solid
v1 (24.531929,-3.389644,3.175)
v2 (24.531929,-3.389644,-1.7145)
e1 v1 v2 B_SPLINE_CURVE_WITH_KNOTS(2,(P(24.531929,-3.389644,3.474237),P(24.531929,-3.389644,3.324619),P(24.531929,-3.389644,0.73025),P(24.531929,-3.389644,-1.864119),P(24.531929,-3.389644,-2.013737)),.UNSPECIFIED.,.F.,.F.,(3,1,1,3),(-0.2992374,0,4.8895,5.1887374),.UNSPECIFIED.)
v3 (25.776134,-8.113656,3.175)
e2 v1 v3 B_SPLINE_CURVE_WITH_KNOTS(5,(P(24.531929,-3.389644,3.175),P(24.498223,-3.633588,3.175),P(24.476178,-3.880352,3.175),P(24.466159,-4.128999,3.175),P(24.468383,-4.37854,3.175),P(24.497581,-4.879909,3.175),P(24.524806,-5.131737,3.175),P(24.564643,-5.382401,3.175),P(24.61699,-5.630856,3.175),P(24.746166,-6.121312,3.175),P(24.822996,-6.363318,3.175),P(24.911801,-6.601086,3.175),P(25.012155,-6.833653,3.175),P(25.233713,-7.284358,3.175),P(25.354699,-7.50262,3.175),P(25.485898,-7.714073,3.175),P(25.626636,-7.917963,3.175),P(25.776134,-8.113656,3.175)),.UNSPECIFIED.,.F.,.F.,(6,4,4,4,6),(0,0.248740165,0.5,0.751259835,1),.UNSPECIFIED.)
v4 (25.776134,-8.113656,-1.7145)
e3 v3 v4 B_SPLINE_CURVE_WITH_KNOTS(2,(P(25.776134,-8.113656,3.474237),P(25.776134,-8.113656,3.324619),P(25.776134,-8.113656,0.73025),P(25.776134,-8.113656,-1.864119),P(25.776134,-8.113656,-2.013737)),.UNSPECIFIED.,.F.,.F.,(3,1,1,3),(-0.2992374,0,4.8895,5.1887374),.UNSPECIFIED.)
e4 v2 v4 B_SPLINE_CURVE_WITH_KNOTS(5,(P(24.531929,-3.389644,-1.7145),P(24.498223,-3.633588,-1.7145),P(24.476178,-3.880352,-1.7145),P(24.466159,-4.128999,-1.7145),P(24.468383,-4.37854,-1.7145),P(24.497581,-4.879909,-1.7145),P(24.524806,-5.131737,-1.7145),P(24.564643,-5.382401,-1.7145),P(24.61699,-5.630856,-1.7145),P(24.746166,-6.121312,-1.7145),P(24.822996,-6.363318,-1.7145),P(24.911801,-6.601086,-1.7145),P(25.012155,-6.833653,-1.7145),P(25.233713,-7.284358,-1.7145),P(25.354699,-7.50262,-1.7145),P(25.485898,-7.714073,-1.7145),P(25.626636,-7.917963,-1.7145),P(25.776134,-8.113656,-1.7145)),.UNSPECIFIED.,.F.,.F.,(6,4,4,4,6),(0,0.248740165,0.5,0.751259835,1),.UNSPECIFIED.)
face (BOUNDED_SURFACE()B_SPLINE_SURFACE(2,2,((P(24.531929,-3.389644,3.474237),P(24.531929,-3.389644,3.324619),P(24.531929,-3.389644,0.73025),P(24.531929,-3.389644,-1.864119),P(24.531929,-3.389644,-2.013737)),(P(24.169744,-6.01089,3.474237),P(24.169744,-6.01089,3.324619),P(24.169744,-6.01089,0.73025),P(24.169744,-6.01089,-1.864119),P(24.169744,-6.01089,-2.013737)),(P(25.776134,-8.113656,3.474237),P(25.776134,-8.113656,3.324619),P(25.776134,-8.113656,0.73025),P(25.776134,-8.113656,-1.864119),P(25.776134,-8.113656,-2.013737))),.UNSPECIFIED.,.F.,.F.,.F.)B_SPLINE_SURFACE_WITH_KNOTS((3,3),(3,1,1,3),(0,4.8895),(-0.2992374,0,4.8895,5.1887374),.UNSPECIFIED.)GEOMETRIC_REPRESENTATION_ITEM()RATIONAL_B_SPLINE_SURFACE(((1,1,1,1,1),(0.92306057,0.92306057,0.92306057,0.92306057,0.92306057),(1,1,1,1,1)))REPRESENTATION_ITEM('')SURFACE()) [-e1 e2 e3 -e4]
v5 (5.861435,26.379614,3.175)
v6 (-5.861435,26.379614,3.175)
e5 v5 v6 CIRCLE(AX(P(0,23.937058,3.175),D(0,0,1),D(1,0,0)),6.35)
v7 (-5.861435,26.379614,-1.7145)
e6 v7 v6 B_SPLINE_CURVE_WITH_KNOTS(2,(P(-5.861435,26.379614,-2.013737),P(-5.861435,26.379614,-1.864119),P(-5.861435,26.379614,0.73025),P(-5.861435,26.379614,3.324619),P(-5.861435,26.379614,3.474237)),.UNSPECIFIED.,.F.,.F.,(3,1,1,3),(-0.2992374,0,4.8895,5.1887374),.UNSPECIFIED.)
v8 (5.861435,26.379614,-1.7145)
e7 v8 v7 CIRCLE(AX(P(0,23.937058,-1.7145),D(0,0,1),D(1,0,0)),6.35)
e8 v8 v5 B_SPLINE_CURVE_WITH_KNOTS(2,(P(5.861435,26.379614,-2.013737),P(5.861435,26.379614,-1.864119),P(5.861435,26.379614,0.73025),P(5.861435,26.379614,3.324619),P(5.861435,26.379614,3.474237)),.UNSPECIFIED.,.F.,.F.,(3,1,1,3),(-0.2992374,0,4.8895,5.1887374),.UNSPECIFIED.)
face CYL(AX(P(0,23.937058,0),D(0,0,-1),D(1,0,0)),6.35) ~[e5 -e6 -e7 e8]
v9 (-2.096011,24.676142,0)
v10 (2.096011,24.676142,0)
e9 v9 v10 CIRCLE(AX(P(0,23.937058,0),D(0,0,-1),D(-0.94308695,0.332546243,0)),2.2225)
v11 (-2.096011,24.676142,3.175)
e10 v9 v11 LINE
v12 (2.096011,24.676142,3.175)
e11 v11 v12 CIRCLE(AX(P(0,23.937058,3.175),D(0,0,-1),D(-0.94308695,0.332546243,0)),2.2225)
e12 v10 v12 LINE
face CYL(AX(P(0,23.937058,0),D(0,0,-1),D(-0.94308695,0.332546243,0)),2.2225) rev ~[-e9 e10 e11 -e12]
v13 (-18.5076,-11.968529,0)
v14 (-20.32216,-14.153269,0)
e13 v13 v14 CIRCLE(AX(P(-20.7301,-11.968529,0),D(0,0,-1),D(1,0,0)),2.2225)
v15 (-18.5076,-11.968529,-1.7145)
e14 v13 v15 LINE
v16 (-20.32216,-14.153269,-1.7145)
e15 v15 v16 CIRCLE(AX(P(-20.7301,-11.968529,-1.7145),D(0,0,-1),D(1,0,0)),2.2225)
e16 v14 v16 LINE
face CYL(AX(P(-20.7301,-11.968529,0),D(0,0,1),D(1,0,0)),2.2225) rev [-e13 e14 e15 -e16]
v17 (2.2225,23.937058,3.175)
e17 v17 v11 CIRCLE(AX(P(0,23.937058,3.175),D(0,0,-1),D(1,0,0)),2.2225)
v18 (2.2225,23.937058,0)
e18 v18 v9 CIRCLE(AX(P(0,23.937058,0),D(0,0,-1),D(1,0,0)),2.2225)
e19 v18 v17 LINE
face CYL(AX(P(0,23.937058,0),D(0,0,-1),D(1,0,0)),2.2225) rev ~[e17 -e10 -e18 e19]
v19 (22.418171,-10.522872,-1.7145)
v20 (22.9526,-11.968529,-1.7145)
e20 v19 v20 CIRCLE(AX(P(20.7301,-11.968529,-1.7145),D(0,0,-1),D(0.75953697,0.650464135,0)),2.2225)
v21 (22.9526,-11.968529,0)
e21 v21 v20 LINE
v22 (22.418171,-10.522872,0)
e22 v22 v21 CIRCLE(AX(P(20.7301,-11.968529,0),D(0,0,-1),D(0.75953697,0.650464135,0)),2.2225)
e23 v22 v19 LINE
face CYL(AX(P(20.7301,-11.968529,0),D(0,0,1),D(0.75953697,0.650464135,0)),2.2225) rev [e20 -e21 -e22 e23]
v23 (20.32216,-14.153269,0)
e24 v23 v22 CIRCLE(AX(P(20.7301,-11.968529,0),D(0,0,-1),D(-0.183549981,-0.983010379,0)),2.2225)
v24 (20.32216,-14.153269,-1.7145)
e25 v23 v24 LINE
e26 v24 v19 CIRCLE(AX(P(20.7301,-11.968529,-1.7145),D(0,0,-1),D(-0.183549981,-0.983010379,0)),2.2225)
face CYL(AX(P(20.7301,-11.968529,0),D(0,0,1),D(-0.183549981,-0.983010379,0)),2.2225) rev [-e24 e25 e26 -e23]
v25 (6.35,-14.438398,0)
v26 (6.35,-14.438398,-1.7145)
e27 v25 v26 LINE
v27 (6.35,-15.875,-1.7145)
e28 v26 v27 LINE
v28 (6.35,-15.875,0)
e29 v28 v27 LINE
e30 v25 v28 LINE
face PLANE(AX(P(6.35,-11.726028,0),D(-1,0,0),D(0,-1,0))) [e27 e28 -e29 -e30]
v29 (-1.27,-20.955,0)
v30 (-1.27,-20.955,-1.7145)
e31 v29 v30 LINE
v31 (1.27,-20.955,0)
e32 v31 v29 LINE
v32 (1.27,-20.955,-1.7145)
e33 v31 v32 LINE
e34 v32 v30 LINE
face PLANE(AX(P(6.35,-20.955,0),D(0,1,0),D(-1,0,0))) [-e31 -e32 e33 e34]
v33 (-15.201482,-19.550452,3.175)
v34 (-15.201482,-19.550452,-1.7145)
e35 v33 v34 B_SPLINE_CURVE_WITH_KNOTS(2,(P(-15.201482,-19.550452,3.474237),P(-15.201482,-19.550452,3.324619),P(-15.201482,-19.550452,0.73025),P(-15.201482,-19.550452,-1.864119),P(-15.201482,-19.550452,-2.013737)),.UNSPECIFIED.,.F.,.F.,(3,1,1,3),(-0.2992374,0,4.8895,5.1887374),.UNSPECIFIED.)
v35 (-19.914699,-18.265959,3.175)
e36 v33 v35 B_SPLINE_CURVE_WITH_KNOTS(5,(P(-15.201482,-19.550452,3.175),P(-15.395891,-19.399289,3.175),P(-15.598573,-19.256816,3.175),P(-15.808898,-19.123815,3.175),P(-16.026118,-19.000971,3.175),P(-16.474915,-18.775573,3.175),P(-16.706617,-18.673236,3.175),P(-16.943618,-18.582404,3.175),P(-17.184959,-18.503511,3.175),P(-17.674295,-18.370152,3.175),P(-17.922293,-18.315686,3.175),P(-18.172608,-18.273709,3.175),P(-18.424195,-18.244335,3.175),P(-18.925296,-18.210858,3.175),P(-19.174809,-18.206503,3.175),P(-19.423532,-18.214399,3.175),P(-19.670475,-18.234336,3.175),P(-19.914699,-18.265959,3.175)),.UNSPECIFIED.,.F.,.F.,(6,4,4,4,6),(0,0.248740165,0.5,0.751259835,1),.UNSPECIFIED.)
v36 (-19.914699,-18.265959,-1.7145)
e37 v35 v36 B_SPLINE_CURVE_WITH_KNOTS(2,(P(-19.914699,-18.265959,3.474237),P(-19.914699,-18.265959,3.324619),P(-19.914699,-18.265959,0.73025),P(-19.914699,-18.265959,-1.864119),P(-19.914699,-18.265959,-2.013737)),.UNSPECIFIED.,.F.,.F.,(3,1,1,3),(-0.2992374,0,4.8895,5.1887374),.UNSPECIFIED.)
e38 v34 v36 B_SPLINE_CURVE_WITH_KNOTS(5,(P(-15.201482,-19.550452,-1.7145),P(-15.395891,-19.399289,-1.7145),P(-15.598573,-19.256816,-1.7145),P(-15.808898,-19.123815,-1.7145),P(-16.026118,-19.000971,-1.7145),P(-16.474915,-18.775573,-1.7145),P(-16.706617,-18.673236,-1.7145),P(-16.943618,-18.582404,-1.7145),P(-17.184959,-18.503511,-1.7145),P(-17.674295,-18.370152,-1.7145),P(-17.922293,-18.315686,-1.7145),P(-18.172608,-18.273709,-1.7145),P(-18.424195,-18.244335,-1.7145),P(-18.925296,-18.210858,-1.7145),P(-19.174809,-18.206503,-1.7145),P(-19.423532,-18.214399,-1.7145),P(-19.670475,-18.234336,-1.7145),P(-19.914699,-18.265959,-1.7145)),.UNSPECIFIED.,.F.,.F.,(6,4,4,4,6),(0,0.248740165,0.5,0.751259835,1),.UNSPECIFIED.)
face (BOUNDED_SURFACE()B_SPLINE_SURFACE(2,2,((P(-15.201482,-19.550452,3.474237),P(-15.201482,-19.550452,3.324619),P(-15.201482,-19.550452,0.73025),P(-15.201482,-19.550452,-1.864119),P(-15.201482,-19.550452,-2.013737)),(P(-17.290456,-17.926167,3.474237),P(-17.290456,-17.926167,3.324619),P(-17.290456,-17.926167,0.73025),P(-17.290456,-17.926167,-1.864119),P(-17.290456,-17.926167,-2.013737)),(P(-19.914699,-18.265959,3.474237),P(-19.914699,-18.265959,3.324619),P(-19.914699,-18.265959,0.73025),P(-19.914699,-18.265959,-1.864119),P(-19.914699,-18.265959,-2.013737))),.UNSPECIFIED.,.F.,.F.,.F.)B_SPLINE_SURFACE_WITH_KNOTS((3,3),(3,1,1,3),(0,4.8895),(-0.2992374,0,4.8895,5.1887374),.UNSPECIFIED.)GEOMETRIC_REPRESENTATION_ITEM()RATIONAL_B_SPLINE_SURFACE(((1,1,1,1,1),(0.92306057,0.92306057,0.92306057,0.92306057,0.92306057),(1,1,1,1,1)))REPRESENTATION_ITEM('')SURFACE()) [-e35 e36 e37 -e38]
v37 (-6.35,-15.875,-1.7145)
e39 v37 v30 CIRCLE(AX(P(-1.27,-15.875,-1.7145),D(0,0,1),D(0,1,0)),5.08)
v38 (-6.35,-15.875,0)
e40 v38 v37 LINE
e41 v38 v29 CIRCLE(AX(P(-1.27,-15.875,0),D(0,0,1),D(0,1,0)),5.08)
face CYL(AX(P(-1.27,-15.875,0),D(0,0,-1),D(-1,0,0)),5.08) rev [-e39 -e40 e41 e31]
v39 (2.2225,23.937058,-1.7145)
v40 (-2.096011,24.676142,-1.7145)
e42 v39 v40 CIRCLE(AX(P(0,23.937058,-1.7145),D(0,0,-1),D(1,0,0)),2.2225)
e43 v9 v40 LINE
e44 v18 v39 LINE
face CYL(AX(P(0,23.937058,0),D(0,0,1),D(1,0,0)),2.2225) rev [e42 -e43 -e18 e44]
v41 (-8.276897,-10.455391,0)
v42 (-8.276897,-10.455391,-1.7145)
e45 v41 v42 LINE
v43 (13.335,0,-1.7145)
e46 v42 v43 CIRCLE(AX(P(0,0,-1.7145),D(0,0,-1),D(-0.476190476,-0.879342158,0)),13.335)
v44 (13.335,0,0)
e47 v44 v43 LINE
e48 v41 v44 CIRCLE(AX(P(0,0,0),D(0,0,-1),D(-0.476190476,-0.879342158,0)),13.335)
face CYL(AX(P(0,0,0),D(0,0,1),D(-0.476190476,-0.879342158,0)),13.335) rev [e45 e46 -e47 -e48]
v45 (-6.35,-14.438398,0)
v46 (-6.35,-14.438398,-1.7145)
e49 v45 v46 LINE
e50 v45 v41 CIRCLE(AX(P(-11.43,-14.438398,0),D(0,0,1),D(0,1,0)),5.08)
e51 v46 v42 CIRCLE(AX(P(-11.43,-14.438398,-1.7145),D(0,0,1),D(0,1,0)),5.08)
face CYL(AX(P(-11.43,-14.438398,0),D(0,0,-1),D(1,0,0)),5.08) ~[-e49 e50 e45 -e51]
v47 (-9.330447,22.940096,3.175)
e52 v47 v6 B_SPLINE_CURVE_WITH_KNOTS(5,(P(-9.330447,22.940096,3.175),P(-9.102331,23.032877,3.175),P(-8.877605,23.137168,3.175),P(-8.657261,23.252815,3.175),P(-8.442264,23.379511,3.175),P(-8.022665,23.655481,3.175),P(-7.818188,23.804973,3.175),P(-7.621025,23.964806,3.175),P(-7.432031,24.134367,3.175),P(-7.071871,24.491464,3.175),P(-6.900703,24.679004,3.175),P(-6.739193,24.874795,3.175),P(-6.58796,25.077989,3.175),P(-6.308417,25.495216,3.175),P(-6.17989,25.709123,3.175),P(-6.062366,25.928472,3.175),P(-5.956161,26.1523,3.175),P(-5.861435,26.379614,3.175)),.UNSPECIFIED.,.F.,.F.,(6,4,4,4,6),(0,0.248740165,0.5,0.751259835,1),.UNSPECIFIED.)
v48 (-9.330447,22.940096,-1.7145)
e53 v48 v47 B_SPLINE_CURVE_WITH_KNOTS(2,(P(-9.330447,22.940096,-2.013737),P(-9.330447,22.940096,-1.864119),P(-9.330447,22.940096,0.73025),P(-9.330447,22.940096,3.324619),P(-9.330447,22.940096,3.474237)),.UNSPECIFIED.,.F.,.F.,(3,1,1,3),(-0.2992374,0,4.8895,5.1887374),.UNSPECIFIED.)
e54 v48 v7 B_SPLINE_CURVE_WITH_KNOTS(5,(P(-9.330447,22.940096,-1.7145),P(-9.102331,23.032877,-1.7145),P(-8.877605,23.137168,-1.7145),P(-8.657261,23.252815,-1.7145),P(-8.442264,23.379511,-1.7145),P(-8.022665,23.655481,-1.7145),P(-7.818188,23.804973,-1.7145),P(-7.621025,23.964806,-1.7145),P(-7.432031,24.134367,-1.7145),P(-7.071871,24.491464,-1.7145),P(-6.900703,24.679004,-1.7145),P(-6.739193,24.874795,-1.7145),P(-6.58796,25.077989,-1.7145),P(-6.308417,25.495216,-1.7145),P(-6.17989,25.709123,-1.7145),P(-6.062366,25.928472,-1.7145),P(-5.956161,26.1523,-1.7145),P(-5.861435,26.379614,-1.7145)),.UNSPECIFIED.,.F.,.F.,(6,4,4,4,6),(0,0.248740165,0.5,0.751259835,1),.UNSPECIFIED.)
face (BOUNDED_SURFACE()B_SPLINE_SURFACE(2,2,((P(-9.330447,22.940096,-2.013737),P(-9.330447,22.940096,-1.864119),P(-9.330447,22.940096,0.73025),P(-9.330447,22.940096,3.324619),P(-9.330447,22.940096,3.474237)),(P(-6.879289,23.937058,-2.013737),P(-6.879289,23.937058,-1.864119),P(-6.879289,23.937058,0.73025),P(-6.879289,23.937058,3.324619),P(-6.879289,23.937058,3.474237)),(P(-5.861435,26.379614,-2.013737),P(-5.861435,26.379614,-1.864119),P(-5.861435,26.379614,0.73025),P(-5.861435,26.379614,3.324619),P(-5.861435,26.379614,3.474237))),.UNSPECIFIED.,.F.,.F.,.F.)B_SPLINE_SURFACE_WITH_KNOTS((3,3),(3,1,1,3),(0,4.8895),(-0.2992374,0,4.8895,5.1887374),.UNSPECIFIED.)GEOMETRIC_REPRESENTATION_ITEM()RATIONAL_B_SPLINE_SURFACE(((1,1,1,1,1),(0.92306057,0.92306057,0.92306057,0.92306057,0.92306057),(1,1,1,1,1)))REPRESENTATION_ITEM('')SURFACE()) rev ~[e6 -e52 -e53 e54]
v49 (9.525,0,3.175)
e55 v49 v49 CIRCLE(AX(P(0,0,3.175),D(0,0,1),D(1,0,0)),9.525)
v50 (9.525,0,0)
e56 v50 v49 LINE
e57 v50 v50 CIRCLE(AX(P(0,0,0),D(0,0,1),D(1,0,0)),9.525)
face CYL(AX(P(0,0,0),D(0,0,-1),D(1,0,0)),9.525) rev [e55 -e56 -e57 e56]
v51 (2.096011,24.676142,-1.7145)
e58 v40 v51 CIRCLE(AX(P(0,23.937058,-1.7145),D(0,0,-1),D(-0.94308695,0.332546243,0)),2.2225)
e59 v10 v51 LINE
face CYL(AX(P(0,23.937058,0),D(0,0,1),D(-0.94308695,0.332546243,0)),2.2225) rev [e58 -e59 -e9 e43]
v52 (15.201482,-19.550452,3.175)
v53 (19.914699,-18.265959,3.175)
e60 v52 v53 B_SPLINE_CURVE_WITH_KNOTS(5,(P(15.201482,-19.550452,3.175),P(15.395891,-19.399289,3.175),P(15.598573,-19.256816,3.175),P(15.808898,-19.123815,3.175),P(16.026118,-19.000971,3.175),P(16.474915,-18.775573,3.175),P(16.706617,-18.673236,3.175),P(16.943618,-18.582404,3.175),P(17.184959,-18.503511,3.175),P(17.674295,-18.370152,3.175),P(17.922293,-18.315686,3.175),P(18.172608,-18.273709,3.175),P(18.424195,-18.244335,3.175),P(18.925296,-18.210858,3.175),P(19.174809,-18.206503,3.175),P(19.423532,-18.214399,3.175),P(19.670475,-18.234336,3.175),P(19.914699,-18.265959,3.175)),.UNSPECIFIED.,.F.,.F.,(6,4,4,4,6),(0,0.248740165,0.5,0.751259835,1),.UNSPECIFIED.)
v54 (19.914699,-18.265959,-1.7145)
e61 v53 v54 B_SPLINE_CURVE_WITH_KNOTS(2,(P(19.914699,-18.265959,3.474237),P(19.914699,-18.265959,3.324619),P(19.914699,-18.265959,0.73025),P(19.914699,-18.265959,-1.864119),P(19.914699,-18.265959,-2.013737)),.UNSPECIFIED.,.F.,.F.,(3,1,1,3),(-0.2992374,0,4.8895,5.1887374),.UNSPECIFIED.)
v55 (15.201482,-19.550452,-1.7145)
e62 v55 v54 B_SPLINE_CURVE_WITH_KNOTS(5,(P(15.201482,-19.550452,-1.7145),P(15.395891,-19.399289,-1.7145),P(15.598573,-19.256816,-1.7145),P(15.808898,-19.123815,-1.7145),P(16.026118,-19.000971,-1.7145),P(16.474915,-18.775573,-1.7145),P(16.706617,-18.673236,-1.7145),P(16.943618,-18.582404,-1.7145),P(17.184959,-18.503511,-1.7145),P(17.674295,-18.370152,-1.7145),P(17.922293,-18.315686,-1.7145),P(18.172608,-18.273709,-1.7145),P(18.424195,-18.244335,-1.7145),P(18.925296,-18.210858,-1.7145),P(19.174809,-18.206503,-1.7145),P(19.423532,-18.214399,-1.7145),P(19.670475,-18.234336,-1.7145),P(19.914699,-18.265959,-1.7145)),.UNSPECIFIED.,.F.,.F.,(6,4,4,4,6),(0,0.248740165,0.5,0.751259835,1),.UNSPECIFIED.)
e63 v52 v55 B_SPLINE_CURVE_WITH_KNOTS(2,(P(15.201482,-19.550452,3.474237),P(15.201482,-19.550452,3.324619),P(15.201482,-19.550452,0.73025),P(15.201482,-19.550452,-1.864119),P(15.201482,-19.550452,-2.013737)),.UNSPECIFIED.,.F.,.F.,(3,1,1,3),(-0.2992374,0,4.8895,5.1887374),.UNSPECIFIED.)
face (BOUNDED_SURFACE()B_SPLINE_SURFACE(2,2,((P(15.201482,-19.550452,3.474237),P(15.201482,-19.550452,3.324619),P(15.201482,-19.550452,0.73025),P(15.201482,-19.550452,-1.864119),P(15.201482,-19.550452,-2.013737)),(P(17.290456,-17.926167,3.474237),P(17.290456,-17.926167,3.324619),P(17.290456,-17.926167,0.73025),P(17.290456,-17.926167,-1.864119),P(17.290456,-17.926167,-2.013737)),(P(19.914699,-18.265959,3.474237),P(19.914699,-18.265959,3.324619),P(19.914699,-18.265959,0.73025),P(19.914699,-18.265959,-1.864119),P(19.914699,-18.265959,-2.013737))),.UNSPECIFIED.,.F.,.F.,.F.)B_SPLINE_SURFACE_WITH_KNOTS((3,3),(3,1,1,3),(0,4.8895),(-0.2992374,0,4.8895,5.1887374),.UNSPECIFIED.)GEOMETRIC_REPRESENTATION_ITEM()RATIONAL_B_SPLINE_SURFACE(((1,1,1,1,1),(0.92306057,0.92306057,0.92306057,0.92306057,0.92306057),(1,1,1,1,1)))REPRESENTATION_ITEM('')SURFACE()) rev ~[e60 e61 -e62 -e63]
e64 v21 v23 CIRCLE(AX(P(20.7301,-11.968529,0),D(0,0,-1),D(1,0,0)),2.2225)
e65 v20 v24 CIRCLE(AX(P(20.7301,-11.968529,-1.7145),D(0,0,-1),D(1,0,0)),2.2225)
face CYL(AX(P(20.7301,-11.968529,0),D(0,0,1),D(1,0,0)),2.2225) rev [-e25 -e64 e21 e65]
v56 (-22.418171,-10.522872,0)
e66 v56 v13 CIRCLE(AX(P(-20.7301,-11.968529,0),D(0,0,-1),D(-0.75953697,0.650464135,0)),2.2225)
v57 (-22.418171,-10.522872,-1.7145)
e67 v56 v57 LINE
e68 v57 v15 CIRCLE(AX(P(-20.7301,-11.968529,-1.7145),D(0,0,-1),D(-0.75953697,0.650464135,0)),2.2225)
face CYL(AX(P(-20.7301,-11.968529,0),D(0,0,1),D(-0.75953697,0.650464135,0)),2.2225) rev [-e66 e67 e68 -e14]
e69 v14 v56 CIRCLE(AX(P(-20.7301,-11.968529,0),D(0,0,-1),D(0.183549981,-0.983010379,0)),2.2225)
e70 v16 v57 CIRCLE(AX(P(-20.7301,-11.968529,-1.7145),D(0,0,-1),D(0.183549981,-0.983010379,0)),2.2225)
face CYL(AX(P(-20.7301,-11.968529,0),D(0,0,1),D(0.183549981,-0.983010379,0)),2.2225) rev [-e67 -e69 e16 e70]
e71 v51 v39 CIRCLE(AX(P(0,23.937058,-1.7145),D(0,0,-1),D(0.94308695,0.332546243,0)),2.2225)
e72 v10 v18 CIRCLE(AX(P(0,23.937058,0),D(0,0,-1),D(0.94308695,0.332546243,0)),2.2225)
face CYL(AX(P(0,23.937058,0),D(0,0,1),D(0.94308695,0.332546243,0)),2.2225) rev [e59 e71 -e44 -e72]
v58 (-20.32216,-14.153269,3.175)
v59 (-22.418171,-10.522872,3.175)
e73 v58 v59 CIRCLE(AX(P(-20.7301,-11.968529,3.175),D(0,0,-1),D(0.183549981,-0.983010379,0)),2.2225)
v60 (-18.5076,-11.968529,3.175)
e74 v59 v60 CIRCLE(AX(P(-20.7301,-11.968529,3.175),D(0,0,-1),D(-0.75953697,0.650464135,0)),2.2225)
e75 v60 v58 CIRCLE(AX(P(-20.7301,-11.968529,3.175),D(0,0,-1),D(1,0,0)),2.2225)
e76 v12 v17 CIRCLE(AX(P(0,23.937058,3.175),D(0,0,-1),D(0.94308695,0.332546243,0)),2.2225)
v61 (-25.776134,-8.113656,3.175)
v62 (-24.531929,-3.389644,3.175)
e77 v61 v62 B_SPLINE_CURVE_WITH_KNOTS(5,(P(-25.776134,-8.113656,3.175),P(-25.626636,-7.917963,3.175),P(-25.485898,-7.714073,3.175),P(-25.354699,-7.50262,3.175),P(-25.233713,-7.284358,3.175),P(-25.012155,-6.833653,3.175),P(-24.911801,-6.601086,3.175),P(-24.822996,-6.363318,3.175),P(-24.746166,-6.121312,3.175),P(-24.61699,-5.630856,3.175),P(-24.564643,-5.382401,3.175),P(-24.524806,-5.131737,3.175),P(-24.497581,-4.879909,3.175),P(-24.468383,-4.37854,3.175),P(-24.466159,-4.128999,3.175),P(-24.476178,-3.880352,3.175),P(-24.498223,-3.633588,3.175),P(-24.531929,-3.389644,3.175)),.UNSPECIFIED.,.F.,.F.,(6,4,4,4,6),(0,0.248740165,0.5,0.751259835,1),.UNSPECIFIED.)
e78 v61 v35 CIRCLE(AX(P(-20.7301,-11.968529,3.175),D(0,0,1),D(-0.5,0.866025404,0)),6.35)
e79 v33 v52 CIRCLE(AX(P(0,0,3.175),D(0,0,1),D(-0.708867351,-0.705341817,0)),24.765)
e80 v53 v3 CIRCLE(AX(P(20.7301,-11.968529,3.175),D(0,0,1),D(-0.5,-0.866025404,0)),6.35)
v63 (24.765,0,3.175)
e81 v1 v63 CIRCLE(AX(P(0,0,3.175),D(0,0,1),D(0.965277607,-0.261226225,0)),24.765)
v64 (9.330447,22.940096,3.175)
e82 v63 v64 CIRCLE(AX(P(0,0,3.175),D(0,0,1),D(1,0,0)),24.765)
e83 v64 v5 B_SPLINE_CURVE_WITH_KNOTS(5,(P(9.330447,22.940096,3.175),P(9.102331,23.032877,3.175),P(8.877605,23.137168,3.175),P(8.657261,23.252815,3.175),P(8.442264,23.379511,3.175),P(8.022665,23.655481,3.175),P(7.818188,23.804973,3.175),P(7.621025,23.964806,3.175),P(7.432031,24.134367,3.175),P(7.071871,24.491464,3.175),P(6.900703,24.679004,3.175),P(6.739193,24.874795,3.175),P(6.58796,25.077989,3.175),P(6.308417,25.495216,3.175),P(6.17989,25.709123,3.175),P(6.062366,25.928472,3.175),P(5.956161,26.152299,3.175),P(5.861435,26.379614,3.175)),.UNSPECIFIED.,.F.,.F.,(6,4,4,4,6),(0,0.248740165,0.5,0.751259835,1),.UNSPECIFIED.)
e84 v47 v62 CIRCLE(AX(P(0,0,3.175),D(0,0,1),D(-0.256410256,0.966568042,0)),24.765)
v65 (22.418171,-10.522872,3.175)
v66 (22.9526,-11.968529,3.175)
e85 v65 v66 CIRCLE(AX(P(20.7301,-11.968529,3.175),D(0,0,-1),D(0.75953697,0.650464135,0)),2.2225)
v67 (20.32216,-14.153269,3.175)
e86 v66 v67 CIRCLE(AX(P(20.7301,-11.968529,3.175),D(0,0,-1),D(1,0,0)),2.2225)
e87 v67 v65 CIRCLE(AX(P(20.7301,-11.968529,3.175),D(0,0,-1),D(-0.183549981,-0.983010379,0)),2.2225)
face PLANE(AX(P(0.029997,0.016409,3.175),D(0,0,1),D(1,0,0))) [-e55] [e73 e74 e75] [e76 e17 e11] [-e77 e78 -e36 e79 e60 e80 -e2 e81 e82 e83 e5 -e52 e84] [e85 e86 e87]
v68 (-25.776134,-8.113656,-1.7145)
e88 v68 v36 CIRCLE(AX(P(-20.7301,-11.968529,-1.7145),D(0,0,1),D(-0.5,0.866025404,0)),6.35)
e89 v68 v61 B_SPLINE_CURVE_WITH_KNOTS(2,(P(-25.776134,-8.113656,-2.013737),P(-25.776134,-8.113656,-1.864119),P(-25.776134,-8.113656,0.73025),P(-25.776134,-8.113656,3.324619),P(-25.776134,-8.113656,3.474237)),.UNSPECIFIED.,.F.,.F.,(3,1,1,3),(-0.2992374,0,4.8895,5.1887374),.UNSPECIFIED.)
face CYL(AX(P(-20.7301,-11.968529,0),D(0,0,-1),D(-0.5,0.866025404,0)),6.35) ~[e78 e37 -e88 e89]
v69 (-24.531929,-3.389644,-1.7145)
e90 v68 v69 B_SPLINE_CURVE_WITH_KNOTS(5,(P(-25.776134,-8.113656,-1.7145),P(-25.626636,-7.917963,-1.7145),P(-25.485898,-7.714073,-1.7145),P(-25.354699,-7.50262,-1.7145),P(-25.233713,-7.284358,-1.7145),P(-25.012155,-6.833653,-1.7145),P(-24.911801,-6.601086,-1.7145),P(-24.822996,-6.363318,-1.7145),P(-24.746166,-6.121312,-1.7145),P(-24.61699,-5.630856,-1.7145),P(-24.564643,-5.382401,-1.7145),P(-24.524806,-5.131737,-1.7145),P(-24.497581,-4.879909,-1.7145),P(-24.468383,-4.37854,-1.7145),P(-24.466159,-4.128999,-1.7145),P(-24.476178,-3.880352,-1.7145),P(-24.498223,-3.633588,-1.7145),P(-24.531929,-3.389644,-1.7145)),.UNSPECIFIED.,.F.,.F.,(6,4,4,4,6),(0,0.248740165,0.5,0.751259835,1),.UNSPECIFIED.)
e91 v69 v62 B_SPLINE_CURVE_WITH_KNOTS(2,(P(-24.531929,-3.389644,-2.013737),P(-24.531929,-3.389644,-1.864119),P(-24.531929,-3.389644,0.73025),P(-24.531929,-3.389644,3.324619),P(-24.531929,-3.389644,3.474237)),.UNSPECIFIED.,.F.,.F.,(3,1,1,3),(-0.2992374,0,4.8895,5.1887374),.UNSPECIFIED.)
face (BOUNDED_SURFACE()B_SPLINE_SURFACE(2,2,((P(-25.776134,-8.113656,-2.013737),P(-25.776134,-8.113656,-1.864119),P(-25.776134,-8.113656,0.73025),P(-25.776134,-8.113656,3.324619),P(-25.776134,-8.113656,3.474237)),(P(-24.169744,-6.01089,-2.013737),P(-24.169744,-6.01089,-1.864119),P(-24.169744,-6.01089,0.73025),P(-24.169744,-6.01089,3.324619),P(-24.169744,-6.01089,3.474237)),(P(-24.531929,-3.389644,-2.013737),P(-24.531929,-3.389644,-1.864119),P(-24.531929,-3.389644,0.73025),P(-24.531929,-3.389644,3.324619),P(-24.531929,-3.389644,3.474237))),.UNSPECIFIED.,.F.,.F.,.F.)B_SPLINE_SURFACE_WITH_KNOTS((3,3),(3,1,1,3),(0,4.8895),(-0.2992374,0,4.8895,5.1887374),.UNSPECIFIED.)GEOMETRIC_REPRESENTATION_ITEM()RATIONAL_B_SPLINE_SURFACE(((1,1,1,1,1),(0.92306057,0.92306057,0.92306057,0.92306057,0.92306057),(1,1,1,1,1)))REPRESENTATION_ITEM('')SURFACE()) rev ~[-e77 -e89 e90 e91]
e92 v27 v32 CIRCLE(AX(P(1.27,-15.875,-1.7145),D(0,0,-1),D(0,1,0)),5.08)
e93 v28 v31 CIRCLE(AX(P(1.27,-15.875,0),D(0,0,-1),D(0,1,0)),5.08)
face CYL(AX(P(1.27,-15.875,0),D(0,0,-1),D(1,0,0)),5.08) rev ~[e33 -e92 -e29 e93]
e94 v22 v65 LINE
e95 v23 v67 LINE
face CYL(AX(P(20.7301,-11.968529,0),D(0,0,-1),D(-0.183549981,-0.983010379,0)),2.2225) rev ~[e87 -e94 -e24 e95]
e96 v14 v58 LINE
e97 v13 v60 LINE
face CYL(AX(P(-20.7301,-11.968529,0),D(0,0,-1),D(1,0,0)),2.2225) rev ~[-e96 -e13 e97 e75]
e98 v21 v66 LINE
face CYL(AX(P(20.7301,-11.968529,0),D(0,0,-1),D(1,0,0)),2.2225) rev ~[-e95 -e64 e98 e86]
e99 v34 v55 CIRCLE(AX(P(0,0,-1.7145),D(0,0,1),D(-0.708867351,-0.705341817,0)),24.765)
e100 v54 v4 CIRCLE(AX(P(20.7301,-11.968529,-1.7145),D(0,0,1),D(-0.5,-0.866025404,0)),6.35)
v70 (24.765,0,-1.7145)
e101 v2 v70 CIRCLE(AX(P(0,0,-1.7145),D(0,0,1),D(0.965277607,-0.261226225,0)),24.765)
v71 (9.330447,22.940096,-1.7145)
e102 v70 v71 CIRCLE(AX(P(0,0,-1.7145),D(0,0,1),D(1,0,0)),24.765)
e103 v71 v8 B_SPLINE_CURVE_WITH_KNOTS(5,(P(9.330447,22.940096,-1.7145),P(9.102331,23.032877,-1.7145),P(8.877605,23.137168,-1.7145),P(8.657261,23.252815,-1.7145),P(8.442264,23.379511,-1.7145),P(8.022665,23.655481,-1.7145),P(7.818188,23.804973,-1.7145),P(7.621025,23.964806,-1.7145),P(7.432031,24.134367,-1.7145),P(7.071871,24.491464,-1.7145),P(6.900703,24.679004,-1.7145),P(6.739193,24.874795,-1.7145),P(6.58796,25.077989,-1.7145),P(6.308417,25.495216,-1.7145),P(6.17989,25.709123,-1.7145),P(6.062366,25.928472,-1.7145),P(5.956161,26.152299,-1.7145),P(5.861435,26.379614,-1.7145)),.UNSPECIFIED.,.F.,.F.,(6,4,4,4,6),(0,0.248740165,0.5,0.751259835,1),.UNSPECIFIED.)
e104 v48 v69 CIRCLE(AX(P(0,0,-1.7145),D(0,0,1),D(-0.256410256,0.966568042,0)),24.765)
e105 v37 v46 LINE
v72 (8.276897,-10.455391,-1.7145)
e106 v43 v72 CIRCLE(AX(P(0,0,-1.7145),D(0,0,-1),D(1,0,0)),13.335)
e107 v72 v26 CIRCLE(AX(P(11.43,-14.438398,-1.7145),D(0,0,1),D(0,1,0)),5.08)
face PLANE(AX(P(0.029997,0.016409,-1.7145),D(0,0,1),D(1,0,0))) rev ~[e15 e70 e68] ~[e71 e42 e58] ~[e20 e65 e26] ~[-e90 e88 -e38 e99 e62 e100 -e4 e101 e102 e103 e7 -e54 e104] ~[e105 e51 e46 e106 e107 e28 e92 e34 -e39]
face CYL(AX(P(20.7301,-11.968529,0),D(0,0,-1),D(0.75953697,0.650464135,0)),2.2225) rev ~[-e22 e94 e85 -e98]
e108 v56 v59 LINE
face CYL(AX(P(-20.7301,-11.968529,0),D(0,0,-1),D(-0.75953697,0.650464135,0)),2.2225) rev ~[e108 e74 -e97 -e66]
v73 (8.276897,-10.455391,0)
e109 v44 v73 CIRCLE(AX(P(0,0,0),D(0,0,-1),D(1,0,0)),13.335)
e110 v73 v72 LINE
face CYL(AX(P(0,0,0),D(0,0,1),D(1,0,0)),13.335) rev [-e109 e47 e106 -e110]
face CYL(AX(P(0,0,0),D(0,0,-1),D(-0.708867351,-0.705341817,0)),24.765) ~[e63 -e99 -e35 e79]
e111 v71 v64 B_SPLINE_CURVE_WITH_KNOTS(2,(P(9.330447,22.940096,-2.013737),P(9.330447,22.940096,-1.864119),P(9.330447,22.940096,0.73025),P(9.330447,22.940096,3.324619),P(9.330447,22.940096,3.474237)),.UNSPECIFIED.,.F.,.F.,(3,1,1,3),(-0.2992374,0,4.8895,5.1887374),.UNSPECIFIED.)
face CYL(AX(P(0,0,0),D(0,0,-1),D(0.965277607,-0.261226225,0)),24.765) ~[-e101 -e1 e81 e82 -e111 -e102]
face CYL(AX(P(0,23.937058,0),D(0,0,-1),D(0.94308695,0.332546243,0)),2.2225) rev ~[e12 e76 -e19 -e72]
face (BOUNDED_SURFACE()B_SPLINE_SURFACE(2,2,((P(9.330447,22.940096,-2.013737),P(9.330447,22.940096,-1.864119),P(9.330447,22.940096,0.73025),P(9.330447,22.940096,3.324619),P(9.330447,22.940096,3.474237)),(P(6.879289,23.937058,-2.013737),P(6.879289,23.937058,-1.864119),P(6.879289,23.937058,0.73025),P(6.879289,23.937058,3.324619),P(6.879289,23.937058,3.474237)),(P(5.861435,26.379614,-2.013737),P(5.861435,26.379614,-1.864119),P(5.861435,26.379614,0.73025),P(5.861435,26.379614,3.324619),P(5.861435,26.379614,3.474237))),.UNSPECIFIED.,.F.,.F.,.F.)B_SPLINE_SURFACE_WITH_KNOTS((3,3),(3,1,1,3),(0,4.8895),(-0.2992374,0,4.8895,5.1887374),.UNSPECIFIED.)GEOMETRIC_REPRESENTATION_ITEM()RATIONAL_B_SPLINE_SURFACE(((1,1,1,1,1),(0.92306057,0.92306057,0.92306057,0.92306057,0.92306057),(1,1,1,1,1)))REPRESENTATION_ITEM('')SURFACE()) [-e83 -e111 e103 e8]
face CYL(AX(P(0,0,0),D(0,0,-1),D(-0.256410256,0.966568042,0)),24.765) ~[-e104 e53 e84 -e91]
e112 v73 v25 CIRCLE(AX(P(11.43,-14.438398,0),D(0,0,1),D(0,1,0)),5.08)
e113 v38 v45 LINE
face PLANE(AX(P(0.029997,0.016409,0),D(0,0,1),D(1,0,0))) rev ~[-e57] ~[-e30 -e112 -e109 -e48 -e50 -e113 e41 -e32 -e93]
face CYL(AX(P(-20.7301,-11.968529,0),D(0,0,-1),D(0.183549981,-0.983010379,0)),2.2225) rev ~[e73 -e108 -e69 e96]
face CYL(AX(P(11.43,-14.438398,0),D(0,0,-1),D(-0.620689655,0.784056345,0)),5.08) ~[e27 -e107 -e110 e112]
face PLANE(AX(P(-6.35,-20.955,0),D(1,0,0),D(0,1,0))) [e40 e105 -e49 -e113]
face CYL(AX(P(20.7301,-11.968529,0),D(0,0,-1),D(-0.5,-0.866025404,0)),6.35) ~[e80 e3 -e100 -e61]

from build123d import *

# Parameters (mm, degrees)
F1_DEPTH = 1.7145
F0_R     = 9.525
F2_DEPTH = 3.175
F3_R     = 6.35
F4_R     = 5.08


with BuildPart() as f1:
    # F0 (on Top) → F1 (new body)
    with BuildSketch(Plane.XY):
        with BuildLine():
            ThreePointArc((23.9050999455, -6.4692674698), (24.5490837421, -3.2630832697), (24.765, 0))
            ThreePointArc((24.765, 0), (19.6285885254, 15.1004548773), (6.35, 23.9370575677))
            ThreePointArc((6.35, 23.9370575677), (4.2391432725, 24.3994854314), (2.0960107473, 24.6761415936))
            ThreePointArc((2.0960107473, 24.6761415936), (2.1906494626, 24.3119724675), (2.2225, 23.9370575677))
            ThreePointArc((2.2225, 23.9370575677), (-0.3749148998, 21.7464081051), (-2.0960107473, 24.6761415936))
            ThreePointArc((-2.0960107473, 24.6761415936), (-4.2391432725, 24.3994854314), (-6.35, 23.9370575677))
            ThreePointArc((-6.35, 23.9370575677), (-21.4471191247, 12.3825), (-23.9050999455, -6.4692674698))
            ThreePointArc((-23.9050999455, -6.4692674698), (-23.2501458591, -8.5285369514), (-22.4181708611, -10.5228722431))
            ThreePointArc((-22.4181708611, -10.5228722431), (-19.9594610417, -9.8839132486), (-18.5075999455, -11.9685287839))
            ThreePointArc((-18.5075999455, -11.9685287839), (-19.02039931, -13.3885393426), (-20.3221601138, -14.1532693505))
            ThreePointArc((-20.3221601138, -14.1532693505), (-19.0110025866, -15.87094848), (-17.5550999455, -17.4677900979))
            ThreePointArc((-17.5550999455, -17.4677900979), (0, -24.765), (17.5550999455, -17.4677900979))
            ThreePointArc((17.5550999455, -17.4677900979), (19.0110025866, -15.87094848), (20.3221601138, -14.1532693505))
            ThreePointArc((20.3221601138, -14.1532693505), (18.8053584856, -10.8572787839), (22.4181708611, -10.5228722431))
            ThreePointArc((22.4181708611, -10.5228722431), (23.2501458591, -8.5285369514), (23.9050999455, -6.4692674698))
        make_face()
        with BuildLine():
            ThreePointArc((-6.35, -11.7260276735), (-6.8244038201, 11.4564277809), (13.335, 0))
            ThreePointArc((13.335, 0), (11.4564277809, -6.8244038201), (6.35, -11.7260276735))
            Line((6.35, -11.7260276735), (6.35, -20.955))
            Line((6.35, -20.955), (-6.35, -20.955))
            Line((-6.35, -20.955), (-6.35, -11.7260276735))
        make_face(mode=Mode.SUBTRACT)
        with BuildLine():
            ThreePointArc((2.0960107473, 24.6761415936), (4.2391432725, 24.3994854314), (6.35, 23.9370575677))
            ThreePointArc((6.35, 23.9370575677), (0, 30.2870575677), (-6.35, 23.9370575677))
            ThreePointArc((-6.35, 23.9370575677), (-4.2391432725, 24.3994854314), (-2.0960107473, 24.6761415936))
            ThreePointArc((-2.0960107473, 24.6761415936), (0, 26.1595575677), (2.0960107473, 24.6761415936))
        make_face()
        with BuildLine():
            ThreePointArc((17.5550999455, -17.4677900979), (26.2293612595, -15.1435287839), (23.9050999455, -6.4692674698))
            ThreePointArc((23.9050999455, -6.4692674698), (23.2501458591, -8.5285369514), (22.4181708611, -10.5228722431))
            ThreePointArc((22.4181708611, -10.5228722431), (22.8147154808, -11.1978898801), (22.9525999455, -11.9685287839))
            ThreePointArc((22.9525999455, -11.9685287839), (22.1501105043, -13.6782294193), (20.3221601138, -14.1532693505))
            ThreePointArc((20.3221601138, -14.1532693505), (19.0110025866, -15.87094848), (17.5550999455, -17.4677900979))
        make_face()
        with BuildLine():
            ThreePointArc((-22.4181708611, -10.5228722431), (-23.2501458591, -8.5285369514), (-23.9050999455, -6.4692674698))
            ThreePointArc((-23.9050999455, -6.4692674698), (-26.2293612595, -15.1435287839), (-17.5550999455, -17.4677900979))
            ThreePointArc((-17.5550999455, -17.4677900979), (-19.0110025866, -15.87094848), (-20.3221601138, -14.1532693505))
            ThreePointArc((-20.3221601138, -14.1532693505), (-22.6548414054, -13.0797787839), (-22.4181708611, -10.5228722431))
        make_face()
    extrude(amount=-F1_DEPTH)

    # F0 (on Top) → F2 (join)
    with BuildSketch(Plane.XY):
        with BuildLine():
            ThreePointArc((23.9050999455, -6.4692674698), (24.5490837421, -3.2630832697), (24.765, 0))
            ThreePointArc((24.765, 0), (19.6285885254, 15.1004548773), (6.35, 23.9370575677))
            ThreePointArc((6.35, 23.9370575677), (4.2391432725, 24.3994854314), (2.0960107473, 24.6761415936))
            ThreePointArc((2.0960107473, 24.6761415936), (2.1906494626, 24.3119724675), (2.2225, 23.9370575677))
            ThreePointArc((2.2225, 23.9370575677), (-0.3749148998, 21.7464081051), (-2.0960107473, 24.6761415936))
            ThreePointArc((-2.0960107473, 24.6761415936), (-4.2391432725, 24.3994854314), (-6.35, 23.9370575677))
            ThreePointArc((-6.35, 23.9370575677), (-21.4471191247, 12.3825), (-23.9050999455, -6.4692674698))
            ThreePointArc((-23.9050999455, -6.4692674698), (-23.2501458591, -8.5285369514), (-22.4181708611, -10.5228722431))
            ThreePointArc((-22.4181708611, -10.5228722431), (-19.9594610417, -9.8839132486), (-18.5075999455, -11.9685287839))
            ThreePointArc((-18.5075999455, -11.9685287839), (-19.02039931, -13.3885393426), (-20.3221601138, -14.1532693505))
            ThreePointArc((-20.3221601138, -14.1532693505), (-19.0110025866, -15.87094848), (-17.5550999455, -17.4677900979))
            ThreePointArc((-17.5550999455, -17.4677900979), (0, -24.765), (17.5550999455, -17.4677900979))
            ThreePointArc((17.5550999455, -17.4677900979), (19.0110025866, -15.87094848), (20.3221601138, -14.1532693505))
            ThreePointArc((20.3221601138, -14.1532693505), (18.8053584856, -10.8572787839), (22.4181708611, -10.5228722431))
            ThreePointArc((22.4181708611, -10.5228722431), (23.2501458591, -8.5285369514), (23.9050999455, -6.4692674698))
        make_face()
        with BuildLine():
            ThreePointArc((-6.35, -11.7260276735), (-6.8244038201, 11.4564277809), (13.335, 0))
            ThreePointArc((13.335, 0), (11.4564277809, -6.8244038201), (6.35, -11.7260276735))
            Line((6.35, -11.7260276735), (6.35, -20.955))
            Line((6.35, -20.955), (-6.35, -20.955))
            Line((-6.35, -20.955), (-6.35, -11.7260276735))
        make_face(mode=Mode.SUBTRACT)
        with BuildLine():
            ThreePointArc((6.35, -11.7260276735), (11.4564277809, -6.8244038201), (13.335, 0))
            ThreePointArc((13.335, 0), (-6.8244038201, 11.4564277809), (-6.35, -11.7260276735))
            ThreePointArc((-6.35, -11.7260276735), (0, -13.335), (6.35, -11.7260276735))
        make_face()
        Circle(F0_R, mode=Mode.SUBTRACT)
        with BuildLine():
            ThreePointArc((6.35, -11.7260276735), (0, -13.335), (-6.35, -11.7260276735))
            Line((-6.35, -11.7260276735), (-6.35, -20.955))
            Line((-6.35, -20.955), (6.35, -20.955))
            Line((6.35, -20.955), (6.35, -11.7260276735))
        make_face()
        with BuildLine():
            ThreePointArc((2.0960107473, 24.6761415936), (4.2391432725, 24.3994854314), (6.35, 23.9370575677))
            ThreePointArc((6.35, 23.9370575677), (0, 30.2870575677), (-6.35, 23.9370575677))
            ThreePointArc((-6.35, 23.9370575677), (-4.2391432725, 24.3994854314), (-2.0960107473, 24.6761415936))
            ThreePointArc((-2.0960107473, 24.6761415936), (0, 26.1595575677), (2.0960107473, 24.6761415936))
        make_face()
        with BuildLine():
            ThreePointArc((-22.4181708611, -10.5228722431), (-23.2501458591, -8.5285369514), (-23.9050999455, -6.4692674698))
            ThreePointArc((-23.9050999455, -6.4692674698), (-26.2293612595, -15.1435287839), (-17.5550999455, -17.4677900979))
            ThreePointArc((-17.5550999455, -17.4677900979), (-19.0110025866, -15.87094848), (-20.3221601138, -14.1532693505))
            ThreePointArc((-20.3221601138, -14.1532693505), (-22.6548414054, -13.0797787839), (-22.4181708611, -10.5228722431))
        make_face()
        with BuildLine():
            ThreePointArc((17.5550999455, -17.4677900979), (26.2293612595, -15.1435287839), (23.9050999455, -6.4692674698))
            ThreePointArc((23.9050999455, -6.4692674698), (23.2501458591, -8.5285369514), (22.4181708611, -10.5228722431))
            ThreePointArc((22.4181708611, -10.5228722431), (22.8147154808, -11.1978898801), (22.9525999455, -11.9685287839))
            ThreePointArc((22.9525999455, -11.9685287839), (22.1501105043, -13.6782294193), (20.3221601138, -14.1532693505))
            ThreePointArc((20.3221601138, -14.1532693505), (19.0110025866, -15.87094848), (17.5550999455, -17.4677900979))
        make_face()
    extrude(amount=F2_DEPTH)

    # F3
    f3_edges = [f1.edges().sort_by_distance(p)[0] for p in [
        (-23.9051, -6.469267, -0.85725),
        (6.35, 23.937058, 0.73025),
        (17.5551, -17.46779, 0.73025),
        (23.9051, -6.469267, 0.73025),
        (-17.5551, -17.46779, -0.85725),
        (-17.5551, -17.46779, 1.5875),
        (-23.9051, -6.469267, 1.5875),
        (-6.35, 23.937058, 1.5875),
        (-6.35, 23.937058, -0.85725),
    ]]
    fillet(f3_edges, radius=F3_R)

    # F4
    f4_edges = [f1.edges().sort_by_distance(p)[0] for p in [
        (-6.35, -11.726028, -0.85725),
        (6.35, -11.726028, -0.85725),
        (6.35, -20.955, -0.85725),
        (-6.35, -20.955, -0.85725),
    ]]
    fillet(f4_edges, radius=F4_R)


solid = f1.part
